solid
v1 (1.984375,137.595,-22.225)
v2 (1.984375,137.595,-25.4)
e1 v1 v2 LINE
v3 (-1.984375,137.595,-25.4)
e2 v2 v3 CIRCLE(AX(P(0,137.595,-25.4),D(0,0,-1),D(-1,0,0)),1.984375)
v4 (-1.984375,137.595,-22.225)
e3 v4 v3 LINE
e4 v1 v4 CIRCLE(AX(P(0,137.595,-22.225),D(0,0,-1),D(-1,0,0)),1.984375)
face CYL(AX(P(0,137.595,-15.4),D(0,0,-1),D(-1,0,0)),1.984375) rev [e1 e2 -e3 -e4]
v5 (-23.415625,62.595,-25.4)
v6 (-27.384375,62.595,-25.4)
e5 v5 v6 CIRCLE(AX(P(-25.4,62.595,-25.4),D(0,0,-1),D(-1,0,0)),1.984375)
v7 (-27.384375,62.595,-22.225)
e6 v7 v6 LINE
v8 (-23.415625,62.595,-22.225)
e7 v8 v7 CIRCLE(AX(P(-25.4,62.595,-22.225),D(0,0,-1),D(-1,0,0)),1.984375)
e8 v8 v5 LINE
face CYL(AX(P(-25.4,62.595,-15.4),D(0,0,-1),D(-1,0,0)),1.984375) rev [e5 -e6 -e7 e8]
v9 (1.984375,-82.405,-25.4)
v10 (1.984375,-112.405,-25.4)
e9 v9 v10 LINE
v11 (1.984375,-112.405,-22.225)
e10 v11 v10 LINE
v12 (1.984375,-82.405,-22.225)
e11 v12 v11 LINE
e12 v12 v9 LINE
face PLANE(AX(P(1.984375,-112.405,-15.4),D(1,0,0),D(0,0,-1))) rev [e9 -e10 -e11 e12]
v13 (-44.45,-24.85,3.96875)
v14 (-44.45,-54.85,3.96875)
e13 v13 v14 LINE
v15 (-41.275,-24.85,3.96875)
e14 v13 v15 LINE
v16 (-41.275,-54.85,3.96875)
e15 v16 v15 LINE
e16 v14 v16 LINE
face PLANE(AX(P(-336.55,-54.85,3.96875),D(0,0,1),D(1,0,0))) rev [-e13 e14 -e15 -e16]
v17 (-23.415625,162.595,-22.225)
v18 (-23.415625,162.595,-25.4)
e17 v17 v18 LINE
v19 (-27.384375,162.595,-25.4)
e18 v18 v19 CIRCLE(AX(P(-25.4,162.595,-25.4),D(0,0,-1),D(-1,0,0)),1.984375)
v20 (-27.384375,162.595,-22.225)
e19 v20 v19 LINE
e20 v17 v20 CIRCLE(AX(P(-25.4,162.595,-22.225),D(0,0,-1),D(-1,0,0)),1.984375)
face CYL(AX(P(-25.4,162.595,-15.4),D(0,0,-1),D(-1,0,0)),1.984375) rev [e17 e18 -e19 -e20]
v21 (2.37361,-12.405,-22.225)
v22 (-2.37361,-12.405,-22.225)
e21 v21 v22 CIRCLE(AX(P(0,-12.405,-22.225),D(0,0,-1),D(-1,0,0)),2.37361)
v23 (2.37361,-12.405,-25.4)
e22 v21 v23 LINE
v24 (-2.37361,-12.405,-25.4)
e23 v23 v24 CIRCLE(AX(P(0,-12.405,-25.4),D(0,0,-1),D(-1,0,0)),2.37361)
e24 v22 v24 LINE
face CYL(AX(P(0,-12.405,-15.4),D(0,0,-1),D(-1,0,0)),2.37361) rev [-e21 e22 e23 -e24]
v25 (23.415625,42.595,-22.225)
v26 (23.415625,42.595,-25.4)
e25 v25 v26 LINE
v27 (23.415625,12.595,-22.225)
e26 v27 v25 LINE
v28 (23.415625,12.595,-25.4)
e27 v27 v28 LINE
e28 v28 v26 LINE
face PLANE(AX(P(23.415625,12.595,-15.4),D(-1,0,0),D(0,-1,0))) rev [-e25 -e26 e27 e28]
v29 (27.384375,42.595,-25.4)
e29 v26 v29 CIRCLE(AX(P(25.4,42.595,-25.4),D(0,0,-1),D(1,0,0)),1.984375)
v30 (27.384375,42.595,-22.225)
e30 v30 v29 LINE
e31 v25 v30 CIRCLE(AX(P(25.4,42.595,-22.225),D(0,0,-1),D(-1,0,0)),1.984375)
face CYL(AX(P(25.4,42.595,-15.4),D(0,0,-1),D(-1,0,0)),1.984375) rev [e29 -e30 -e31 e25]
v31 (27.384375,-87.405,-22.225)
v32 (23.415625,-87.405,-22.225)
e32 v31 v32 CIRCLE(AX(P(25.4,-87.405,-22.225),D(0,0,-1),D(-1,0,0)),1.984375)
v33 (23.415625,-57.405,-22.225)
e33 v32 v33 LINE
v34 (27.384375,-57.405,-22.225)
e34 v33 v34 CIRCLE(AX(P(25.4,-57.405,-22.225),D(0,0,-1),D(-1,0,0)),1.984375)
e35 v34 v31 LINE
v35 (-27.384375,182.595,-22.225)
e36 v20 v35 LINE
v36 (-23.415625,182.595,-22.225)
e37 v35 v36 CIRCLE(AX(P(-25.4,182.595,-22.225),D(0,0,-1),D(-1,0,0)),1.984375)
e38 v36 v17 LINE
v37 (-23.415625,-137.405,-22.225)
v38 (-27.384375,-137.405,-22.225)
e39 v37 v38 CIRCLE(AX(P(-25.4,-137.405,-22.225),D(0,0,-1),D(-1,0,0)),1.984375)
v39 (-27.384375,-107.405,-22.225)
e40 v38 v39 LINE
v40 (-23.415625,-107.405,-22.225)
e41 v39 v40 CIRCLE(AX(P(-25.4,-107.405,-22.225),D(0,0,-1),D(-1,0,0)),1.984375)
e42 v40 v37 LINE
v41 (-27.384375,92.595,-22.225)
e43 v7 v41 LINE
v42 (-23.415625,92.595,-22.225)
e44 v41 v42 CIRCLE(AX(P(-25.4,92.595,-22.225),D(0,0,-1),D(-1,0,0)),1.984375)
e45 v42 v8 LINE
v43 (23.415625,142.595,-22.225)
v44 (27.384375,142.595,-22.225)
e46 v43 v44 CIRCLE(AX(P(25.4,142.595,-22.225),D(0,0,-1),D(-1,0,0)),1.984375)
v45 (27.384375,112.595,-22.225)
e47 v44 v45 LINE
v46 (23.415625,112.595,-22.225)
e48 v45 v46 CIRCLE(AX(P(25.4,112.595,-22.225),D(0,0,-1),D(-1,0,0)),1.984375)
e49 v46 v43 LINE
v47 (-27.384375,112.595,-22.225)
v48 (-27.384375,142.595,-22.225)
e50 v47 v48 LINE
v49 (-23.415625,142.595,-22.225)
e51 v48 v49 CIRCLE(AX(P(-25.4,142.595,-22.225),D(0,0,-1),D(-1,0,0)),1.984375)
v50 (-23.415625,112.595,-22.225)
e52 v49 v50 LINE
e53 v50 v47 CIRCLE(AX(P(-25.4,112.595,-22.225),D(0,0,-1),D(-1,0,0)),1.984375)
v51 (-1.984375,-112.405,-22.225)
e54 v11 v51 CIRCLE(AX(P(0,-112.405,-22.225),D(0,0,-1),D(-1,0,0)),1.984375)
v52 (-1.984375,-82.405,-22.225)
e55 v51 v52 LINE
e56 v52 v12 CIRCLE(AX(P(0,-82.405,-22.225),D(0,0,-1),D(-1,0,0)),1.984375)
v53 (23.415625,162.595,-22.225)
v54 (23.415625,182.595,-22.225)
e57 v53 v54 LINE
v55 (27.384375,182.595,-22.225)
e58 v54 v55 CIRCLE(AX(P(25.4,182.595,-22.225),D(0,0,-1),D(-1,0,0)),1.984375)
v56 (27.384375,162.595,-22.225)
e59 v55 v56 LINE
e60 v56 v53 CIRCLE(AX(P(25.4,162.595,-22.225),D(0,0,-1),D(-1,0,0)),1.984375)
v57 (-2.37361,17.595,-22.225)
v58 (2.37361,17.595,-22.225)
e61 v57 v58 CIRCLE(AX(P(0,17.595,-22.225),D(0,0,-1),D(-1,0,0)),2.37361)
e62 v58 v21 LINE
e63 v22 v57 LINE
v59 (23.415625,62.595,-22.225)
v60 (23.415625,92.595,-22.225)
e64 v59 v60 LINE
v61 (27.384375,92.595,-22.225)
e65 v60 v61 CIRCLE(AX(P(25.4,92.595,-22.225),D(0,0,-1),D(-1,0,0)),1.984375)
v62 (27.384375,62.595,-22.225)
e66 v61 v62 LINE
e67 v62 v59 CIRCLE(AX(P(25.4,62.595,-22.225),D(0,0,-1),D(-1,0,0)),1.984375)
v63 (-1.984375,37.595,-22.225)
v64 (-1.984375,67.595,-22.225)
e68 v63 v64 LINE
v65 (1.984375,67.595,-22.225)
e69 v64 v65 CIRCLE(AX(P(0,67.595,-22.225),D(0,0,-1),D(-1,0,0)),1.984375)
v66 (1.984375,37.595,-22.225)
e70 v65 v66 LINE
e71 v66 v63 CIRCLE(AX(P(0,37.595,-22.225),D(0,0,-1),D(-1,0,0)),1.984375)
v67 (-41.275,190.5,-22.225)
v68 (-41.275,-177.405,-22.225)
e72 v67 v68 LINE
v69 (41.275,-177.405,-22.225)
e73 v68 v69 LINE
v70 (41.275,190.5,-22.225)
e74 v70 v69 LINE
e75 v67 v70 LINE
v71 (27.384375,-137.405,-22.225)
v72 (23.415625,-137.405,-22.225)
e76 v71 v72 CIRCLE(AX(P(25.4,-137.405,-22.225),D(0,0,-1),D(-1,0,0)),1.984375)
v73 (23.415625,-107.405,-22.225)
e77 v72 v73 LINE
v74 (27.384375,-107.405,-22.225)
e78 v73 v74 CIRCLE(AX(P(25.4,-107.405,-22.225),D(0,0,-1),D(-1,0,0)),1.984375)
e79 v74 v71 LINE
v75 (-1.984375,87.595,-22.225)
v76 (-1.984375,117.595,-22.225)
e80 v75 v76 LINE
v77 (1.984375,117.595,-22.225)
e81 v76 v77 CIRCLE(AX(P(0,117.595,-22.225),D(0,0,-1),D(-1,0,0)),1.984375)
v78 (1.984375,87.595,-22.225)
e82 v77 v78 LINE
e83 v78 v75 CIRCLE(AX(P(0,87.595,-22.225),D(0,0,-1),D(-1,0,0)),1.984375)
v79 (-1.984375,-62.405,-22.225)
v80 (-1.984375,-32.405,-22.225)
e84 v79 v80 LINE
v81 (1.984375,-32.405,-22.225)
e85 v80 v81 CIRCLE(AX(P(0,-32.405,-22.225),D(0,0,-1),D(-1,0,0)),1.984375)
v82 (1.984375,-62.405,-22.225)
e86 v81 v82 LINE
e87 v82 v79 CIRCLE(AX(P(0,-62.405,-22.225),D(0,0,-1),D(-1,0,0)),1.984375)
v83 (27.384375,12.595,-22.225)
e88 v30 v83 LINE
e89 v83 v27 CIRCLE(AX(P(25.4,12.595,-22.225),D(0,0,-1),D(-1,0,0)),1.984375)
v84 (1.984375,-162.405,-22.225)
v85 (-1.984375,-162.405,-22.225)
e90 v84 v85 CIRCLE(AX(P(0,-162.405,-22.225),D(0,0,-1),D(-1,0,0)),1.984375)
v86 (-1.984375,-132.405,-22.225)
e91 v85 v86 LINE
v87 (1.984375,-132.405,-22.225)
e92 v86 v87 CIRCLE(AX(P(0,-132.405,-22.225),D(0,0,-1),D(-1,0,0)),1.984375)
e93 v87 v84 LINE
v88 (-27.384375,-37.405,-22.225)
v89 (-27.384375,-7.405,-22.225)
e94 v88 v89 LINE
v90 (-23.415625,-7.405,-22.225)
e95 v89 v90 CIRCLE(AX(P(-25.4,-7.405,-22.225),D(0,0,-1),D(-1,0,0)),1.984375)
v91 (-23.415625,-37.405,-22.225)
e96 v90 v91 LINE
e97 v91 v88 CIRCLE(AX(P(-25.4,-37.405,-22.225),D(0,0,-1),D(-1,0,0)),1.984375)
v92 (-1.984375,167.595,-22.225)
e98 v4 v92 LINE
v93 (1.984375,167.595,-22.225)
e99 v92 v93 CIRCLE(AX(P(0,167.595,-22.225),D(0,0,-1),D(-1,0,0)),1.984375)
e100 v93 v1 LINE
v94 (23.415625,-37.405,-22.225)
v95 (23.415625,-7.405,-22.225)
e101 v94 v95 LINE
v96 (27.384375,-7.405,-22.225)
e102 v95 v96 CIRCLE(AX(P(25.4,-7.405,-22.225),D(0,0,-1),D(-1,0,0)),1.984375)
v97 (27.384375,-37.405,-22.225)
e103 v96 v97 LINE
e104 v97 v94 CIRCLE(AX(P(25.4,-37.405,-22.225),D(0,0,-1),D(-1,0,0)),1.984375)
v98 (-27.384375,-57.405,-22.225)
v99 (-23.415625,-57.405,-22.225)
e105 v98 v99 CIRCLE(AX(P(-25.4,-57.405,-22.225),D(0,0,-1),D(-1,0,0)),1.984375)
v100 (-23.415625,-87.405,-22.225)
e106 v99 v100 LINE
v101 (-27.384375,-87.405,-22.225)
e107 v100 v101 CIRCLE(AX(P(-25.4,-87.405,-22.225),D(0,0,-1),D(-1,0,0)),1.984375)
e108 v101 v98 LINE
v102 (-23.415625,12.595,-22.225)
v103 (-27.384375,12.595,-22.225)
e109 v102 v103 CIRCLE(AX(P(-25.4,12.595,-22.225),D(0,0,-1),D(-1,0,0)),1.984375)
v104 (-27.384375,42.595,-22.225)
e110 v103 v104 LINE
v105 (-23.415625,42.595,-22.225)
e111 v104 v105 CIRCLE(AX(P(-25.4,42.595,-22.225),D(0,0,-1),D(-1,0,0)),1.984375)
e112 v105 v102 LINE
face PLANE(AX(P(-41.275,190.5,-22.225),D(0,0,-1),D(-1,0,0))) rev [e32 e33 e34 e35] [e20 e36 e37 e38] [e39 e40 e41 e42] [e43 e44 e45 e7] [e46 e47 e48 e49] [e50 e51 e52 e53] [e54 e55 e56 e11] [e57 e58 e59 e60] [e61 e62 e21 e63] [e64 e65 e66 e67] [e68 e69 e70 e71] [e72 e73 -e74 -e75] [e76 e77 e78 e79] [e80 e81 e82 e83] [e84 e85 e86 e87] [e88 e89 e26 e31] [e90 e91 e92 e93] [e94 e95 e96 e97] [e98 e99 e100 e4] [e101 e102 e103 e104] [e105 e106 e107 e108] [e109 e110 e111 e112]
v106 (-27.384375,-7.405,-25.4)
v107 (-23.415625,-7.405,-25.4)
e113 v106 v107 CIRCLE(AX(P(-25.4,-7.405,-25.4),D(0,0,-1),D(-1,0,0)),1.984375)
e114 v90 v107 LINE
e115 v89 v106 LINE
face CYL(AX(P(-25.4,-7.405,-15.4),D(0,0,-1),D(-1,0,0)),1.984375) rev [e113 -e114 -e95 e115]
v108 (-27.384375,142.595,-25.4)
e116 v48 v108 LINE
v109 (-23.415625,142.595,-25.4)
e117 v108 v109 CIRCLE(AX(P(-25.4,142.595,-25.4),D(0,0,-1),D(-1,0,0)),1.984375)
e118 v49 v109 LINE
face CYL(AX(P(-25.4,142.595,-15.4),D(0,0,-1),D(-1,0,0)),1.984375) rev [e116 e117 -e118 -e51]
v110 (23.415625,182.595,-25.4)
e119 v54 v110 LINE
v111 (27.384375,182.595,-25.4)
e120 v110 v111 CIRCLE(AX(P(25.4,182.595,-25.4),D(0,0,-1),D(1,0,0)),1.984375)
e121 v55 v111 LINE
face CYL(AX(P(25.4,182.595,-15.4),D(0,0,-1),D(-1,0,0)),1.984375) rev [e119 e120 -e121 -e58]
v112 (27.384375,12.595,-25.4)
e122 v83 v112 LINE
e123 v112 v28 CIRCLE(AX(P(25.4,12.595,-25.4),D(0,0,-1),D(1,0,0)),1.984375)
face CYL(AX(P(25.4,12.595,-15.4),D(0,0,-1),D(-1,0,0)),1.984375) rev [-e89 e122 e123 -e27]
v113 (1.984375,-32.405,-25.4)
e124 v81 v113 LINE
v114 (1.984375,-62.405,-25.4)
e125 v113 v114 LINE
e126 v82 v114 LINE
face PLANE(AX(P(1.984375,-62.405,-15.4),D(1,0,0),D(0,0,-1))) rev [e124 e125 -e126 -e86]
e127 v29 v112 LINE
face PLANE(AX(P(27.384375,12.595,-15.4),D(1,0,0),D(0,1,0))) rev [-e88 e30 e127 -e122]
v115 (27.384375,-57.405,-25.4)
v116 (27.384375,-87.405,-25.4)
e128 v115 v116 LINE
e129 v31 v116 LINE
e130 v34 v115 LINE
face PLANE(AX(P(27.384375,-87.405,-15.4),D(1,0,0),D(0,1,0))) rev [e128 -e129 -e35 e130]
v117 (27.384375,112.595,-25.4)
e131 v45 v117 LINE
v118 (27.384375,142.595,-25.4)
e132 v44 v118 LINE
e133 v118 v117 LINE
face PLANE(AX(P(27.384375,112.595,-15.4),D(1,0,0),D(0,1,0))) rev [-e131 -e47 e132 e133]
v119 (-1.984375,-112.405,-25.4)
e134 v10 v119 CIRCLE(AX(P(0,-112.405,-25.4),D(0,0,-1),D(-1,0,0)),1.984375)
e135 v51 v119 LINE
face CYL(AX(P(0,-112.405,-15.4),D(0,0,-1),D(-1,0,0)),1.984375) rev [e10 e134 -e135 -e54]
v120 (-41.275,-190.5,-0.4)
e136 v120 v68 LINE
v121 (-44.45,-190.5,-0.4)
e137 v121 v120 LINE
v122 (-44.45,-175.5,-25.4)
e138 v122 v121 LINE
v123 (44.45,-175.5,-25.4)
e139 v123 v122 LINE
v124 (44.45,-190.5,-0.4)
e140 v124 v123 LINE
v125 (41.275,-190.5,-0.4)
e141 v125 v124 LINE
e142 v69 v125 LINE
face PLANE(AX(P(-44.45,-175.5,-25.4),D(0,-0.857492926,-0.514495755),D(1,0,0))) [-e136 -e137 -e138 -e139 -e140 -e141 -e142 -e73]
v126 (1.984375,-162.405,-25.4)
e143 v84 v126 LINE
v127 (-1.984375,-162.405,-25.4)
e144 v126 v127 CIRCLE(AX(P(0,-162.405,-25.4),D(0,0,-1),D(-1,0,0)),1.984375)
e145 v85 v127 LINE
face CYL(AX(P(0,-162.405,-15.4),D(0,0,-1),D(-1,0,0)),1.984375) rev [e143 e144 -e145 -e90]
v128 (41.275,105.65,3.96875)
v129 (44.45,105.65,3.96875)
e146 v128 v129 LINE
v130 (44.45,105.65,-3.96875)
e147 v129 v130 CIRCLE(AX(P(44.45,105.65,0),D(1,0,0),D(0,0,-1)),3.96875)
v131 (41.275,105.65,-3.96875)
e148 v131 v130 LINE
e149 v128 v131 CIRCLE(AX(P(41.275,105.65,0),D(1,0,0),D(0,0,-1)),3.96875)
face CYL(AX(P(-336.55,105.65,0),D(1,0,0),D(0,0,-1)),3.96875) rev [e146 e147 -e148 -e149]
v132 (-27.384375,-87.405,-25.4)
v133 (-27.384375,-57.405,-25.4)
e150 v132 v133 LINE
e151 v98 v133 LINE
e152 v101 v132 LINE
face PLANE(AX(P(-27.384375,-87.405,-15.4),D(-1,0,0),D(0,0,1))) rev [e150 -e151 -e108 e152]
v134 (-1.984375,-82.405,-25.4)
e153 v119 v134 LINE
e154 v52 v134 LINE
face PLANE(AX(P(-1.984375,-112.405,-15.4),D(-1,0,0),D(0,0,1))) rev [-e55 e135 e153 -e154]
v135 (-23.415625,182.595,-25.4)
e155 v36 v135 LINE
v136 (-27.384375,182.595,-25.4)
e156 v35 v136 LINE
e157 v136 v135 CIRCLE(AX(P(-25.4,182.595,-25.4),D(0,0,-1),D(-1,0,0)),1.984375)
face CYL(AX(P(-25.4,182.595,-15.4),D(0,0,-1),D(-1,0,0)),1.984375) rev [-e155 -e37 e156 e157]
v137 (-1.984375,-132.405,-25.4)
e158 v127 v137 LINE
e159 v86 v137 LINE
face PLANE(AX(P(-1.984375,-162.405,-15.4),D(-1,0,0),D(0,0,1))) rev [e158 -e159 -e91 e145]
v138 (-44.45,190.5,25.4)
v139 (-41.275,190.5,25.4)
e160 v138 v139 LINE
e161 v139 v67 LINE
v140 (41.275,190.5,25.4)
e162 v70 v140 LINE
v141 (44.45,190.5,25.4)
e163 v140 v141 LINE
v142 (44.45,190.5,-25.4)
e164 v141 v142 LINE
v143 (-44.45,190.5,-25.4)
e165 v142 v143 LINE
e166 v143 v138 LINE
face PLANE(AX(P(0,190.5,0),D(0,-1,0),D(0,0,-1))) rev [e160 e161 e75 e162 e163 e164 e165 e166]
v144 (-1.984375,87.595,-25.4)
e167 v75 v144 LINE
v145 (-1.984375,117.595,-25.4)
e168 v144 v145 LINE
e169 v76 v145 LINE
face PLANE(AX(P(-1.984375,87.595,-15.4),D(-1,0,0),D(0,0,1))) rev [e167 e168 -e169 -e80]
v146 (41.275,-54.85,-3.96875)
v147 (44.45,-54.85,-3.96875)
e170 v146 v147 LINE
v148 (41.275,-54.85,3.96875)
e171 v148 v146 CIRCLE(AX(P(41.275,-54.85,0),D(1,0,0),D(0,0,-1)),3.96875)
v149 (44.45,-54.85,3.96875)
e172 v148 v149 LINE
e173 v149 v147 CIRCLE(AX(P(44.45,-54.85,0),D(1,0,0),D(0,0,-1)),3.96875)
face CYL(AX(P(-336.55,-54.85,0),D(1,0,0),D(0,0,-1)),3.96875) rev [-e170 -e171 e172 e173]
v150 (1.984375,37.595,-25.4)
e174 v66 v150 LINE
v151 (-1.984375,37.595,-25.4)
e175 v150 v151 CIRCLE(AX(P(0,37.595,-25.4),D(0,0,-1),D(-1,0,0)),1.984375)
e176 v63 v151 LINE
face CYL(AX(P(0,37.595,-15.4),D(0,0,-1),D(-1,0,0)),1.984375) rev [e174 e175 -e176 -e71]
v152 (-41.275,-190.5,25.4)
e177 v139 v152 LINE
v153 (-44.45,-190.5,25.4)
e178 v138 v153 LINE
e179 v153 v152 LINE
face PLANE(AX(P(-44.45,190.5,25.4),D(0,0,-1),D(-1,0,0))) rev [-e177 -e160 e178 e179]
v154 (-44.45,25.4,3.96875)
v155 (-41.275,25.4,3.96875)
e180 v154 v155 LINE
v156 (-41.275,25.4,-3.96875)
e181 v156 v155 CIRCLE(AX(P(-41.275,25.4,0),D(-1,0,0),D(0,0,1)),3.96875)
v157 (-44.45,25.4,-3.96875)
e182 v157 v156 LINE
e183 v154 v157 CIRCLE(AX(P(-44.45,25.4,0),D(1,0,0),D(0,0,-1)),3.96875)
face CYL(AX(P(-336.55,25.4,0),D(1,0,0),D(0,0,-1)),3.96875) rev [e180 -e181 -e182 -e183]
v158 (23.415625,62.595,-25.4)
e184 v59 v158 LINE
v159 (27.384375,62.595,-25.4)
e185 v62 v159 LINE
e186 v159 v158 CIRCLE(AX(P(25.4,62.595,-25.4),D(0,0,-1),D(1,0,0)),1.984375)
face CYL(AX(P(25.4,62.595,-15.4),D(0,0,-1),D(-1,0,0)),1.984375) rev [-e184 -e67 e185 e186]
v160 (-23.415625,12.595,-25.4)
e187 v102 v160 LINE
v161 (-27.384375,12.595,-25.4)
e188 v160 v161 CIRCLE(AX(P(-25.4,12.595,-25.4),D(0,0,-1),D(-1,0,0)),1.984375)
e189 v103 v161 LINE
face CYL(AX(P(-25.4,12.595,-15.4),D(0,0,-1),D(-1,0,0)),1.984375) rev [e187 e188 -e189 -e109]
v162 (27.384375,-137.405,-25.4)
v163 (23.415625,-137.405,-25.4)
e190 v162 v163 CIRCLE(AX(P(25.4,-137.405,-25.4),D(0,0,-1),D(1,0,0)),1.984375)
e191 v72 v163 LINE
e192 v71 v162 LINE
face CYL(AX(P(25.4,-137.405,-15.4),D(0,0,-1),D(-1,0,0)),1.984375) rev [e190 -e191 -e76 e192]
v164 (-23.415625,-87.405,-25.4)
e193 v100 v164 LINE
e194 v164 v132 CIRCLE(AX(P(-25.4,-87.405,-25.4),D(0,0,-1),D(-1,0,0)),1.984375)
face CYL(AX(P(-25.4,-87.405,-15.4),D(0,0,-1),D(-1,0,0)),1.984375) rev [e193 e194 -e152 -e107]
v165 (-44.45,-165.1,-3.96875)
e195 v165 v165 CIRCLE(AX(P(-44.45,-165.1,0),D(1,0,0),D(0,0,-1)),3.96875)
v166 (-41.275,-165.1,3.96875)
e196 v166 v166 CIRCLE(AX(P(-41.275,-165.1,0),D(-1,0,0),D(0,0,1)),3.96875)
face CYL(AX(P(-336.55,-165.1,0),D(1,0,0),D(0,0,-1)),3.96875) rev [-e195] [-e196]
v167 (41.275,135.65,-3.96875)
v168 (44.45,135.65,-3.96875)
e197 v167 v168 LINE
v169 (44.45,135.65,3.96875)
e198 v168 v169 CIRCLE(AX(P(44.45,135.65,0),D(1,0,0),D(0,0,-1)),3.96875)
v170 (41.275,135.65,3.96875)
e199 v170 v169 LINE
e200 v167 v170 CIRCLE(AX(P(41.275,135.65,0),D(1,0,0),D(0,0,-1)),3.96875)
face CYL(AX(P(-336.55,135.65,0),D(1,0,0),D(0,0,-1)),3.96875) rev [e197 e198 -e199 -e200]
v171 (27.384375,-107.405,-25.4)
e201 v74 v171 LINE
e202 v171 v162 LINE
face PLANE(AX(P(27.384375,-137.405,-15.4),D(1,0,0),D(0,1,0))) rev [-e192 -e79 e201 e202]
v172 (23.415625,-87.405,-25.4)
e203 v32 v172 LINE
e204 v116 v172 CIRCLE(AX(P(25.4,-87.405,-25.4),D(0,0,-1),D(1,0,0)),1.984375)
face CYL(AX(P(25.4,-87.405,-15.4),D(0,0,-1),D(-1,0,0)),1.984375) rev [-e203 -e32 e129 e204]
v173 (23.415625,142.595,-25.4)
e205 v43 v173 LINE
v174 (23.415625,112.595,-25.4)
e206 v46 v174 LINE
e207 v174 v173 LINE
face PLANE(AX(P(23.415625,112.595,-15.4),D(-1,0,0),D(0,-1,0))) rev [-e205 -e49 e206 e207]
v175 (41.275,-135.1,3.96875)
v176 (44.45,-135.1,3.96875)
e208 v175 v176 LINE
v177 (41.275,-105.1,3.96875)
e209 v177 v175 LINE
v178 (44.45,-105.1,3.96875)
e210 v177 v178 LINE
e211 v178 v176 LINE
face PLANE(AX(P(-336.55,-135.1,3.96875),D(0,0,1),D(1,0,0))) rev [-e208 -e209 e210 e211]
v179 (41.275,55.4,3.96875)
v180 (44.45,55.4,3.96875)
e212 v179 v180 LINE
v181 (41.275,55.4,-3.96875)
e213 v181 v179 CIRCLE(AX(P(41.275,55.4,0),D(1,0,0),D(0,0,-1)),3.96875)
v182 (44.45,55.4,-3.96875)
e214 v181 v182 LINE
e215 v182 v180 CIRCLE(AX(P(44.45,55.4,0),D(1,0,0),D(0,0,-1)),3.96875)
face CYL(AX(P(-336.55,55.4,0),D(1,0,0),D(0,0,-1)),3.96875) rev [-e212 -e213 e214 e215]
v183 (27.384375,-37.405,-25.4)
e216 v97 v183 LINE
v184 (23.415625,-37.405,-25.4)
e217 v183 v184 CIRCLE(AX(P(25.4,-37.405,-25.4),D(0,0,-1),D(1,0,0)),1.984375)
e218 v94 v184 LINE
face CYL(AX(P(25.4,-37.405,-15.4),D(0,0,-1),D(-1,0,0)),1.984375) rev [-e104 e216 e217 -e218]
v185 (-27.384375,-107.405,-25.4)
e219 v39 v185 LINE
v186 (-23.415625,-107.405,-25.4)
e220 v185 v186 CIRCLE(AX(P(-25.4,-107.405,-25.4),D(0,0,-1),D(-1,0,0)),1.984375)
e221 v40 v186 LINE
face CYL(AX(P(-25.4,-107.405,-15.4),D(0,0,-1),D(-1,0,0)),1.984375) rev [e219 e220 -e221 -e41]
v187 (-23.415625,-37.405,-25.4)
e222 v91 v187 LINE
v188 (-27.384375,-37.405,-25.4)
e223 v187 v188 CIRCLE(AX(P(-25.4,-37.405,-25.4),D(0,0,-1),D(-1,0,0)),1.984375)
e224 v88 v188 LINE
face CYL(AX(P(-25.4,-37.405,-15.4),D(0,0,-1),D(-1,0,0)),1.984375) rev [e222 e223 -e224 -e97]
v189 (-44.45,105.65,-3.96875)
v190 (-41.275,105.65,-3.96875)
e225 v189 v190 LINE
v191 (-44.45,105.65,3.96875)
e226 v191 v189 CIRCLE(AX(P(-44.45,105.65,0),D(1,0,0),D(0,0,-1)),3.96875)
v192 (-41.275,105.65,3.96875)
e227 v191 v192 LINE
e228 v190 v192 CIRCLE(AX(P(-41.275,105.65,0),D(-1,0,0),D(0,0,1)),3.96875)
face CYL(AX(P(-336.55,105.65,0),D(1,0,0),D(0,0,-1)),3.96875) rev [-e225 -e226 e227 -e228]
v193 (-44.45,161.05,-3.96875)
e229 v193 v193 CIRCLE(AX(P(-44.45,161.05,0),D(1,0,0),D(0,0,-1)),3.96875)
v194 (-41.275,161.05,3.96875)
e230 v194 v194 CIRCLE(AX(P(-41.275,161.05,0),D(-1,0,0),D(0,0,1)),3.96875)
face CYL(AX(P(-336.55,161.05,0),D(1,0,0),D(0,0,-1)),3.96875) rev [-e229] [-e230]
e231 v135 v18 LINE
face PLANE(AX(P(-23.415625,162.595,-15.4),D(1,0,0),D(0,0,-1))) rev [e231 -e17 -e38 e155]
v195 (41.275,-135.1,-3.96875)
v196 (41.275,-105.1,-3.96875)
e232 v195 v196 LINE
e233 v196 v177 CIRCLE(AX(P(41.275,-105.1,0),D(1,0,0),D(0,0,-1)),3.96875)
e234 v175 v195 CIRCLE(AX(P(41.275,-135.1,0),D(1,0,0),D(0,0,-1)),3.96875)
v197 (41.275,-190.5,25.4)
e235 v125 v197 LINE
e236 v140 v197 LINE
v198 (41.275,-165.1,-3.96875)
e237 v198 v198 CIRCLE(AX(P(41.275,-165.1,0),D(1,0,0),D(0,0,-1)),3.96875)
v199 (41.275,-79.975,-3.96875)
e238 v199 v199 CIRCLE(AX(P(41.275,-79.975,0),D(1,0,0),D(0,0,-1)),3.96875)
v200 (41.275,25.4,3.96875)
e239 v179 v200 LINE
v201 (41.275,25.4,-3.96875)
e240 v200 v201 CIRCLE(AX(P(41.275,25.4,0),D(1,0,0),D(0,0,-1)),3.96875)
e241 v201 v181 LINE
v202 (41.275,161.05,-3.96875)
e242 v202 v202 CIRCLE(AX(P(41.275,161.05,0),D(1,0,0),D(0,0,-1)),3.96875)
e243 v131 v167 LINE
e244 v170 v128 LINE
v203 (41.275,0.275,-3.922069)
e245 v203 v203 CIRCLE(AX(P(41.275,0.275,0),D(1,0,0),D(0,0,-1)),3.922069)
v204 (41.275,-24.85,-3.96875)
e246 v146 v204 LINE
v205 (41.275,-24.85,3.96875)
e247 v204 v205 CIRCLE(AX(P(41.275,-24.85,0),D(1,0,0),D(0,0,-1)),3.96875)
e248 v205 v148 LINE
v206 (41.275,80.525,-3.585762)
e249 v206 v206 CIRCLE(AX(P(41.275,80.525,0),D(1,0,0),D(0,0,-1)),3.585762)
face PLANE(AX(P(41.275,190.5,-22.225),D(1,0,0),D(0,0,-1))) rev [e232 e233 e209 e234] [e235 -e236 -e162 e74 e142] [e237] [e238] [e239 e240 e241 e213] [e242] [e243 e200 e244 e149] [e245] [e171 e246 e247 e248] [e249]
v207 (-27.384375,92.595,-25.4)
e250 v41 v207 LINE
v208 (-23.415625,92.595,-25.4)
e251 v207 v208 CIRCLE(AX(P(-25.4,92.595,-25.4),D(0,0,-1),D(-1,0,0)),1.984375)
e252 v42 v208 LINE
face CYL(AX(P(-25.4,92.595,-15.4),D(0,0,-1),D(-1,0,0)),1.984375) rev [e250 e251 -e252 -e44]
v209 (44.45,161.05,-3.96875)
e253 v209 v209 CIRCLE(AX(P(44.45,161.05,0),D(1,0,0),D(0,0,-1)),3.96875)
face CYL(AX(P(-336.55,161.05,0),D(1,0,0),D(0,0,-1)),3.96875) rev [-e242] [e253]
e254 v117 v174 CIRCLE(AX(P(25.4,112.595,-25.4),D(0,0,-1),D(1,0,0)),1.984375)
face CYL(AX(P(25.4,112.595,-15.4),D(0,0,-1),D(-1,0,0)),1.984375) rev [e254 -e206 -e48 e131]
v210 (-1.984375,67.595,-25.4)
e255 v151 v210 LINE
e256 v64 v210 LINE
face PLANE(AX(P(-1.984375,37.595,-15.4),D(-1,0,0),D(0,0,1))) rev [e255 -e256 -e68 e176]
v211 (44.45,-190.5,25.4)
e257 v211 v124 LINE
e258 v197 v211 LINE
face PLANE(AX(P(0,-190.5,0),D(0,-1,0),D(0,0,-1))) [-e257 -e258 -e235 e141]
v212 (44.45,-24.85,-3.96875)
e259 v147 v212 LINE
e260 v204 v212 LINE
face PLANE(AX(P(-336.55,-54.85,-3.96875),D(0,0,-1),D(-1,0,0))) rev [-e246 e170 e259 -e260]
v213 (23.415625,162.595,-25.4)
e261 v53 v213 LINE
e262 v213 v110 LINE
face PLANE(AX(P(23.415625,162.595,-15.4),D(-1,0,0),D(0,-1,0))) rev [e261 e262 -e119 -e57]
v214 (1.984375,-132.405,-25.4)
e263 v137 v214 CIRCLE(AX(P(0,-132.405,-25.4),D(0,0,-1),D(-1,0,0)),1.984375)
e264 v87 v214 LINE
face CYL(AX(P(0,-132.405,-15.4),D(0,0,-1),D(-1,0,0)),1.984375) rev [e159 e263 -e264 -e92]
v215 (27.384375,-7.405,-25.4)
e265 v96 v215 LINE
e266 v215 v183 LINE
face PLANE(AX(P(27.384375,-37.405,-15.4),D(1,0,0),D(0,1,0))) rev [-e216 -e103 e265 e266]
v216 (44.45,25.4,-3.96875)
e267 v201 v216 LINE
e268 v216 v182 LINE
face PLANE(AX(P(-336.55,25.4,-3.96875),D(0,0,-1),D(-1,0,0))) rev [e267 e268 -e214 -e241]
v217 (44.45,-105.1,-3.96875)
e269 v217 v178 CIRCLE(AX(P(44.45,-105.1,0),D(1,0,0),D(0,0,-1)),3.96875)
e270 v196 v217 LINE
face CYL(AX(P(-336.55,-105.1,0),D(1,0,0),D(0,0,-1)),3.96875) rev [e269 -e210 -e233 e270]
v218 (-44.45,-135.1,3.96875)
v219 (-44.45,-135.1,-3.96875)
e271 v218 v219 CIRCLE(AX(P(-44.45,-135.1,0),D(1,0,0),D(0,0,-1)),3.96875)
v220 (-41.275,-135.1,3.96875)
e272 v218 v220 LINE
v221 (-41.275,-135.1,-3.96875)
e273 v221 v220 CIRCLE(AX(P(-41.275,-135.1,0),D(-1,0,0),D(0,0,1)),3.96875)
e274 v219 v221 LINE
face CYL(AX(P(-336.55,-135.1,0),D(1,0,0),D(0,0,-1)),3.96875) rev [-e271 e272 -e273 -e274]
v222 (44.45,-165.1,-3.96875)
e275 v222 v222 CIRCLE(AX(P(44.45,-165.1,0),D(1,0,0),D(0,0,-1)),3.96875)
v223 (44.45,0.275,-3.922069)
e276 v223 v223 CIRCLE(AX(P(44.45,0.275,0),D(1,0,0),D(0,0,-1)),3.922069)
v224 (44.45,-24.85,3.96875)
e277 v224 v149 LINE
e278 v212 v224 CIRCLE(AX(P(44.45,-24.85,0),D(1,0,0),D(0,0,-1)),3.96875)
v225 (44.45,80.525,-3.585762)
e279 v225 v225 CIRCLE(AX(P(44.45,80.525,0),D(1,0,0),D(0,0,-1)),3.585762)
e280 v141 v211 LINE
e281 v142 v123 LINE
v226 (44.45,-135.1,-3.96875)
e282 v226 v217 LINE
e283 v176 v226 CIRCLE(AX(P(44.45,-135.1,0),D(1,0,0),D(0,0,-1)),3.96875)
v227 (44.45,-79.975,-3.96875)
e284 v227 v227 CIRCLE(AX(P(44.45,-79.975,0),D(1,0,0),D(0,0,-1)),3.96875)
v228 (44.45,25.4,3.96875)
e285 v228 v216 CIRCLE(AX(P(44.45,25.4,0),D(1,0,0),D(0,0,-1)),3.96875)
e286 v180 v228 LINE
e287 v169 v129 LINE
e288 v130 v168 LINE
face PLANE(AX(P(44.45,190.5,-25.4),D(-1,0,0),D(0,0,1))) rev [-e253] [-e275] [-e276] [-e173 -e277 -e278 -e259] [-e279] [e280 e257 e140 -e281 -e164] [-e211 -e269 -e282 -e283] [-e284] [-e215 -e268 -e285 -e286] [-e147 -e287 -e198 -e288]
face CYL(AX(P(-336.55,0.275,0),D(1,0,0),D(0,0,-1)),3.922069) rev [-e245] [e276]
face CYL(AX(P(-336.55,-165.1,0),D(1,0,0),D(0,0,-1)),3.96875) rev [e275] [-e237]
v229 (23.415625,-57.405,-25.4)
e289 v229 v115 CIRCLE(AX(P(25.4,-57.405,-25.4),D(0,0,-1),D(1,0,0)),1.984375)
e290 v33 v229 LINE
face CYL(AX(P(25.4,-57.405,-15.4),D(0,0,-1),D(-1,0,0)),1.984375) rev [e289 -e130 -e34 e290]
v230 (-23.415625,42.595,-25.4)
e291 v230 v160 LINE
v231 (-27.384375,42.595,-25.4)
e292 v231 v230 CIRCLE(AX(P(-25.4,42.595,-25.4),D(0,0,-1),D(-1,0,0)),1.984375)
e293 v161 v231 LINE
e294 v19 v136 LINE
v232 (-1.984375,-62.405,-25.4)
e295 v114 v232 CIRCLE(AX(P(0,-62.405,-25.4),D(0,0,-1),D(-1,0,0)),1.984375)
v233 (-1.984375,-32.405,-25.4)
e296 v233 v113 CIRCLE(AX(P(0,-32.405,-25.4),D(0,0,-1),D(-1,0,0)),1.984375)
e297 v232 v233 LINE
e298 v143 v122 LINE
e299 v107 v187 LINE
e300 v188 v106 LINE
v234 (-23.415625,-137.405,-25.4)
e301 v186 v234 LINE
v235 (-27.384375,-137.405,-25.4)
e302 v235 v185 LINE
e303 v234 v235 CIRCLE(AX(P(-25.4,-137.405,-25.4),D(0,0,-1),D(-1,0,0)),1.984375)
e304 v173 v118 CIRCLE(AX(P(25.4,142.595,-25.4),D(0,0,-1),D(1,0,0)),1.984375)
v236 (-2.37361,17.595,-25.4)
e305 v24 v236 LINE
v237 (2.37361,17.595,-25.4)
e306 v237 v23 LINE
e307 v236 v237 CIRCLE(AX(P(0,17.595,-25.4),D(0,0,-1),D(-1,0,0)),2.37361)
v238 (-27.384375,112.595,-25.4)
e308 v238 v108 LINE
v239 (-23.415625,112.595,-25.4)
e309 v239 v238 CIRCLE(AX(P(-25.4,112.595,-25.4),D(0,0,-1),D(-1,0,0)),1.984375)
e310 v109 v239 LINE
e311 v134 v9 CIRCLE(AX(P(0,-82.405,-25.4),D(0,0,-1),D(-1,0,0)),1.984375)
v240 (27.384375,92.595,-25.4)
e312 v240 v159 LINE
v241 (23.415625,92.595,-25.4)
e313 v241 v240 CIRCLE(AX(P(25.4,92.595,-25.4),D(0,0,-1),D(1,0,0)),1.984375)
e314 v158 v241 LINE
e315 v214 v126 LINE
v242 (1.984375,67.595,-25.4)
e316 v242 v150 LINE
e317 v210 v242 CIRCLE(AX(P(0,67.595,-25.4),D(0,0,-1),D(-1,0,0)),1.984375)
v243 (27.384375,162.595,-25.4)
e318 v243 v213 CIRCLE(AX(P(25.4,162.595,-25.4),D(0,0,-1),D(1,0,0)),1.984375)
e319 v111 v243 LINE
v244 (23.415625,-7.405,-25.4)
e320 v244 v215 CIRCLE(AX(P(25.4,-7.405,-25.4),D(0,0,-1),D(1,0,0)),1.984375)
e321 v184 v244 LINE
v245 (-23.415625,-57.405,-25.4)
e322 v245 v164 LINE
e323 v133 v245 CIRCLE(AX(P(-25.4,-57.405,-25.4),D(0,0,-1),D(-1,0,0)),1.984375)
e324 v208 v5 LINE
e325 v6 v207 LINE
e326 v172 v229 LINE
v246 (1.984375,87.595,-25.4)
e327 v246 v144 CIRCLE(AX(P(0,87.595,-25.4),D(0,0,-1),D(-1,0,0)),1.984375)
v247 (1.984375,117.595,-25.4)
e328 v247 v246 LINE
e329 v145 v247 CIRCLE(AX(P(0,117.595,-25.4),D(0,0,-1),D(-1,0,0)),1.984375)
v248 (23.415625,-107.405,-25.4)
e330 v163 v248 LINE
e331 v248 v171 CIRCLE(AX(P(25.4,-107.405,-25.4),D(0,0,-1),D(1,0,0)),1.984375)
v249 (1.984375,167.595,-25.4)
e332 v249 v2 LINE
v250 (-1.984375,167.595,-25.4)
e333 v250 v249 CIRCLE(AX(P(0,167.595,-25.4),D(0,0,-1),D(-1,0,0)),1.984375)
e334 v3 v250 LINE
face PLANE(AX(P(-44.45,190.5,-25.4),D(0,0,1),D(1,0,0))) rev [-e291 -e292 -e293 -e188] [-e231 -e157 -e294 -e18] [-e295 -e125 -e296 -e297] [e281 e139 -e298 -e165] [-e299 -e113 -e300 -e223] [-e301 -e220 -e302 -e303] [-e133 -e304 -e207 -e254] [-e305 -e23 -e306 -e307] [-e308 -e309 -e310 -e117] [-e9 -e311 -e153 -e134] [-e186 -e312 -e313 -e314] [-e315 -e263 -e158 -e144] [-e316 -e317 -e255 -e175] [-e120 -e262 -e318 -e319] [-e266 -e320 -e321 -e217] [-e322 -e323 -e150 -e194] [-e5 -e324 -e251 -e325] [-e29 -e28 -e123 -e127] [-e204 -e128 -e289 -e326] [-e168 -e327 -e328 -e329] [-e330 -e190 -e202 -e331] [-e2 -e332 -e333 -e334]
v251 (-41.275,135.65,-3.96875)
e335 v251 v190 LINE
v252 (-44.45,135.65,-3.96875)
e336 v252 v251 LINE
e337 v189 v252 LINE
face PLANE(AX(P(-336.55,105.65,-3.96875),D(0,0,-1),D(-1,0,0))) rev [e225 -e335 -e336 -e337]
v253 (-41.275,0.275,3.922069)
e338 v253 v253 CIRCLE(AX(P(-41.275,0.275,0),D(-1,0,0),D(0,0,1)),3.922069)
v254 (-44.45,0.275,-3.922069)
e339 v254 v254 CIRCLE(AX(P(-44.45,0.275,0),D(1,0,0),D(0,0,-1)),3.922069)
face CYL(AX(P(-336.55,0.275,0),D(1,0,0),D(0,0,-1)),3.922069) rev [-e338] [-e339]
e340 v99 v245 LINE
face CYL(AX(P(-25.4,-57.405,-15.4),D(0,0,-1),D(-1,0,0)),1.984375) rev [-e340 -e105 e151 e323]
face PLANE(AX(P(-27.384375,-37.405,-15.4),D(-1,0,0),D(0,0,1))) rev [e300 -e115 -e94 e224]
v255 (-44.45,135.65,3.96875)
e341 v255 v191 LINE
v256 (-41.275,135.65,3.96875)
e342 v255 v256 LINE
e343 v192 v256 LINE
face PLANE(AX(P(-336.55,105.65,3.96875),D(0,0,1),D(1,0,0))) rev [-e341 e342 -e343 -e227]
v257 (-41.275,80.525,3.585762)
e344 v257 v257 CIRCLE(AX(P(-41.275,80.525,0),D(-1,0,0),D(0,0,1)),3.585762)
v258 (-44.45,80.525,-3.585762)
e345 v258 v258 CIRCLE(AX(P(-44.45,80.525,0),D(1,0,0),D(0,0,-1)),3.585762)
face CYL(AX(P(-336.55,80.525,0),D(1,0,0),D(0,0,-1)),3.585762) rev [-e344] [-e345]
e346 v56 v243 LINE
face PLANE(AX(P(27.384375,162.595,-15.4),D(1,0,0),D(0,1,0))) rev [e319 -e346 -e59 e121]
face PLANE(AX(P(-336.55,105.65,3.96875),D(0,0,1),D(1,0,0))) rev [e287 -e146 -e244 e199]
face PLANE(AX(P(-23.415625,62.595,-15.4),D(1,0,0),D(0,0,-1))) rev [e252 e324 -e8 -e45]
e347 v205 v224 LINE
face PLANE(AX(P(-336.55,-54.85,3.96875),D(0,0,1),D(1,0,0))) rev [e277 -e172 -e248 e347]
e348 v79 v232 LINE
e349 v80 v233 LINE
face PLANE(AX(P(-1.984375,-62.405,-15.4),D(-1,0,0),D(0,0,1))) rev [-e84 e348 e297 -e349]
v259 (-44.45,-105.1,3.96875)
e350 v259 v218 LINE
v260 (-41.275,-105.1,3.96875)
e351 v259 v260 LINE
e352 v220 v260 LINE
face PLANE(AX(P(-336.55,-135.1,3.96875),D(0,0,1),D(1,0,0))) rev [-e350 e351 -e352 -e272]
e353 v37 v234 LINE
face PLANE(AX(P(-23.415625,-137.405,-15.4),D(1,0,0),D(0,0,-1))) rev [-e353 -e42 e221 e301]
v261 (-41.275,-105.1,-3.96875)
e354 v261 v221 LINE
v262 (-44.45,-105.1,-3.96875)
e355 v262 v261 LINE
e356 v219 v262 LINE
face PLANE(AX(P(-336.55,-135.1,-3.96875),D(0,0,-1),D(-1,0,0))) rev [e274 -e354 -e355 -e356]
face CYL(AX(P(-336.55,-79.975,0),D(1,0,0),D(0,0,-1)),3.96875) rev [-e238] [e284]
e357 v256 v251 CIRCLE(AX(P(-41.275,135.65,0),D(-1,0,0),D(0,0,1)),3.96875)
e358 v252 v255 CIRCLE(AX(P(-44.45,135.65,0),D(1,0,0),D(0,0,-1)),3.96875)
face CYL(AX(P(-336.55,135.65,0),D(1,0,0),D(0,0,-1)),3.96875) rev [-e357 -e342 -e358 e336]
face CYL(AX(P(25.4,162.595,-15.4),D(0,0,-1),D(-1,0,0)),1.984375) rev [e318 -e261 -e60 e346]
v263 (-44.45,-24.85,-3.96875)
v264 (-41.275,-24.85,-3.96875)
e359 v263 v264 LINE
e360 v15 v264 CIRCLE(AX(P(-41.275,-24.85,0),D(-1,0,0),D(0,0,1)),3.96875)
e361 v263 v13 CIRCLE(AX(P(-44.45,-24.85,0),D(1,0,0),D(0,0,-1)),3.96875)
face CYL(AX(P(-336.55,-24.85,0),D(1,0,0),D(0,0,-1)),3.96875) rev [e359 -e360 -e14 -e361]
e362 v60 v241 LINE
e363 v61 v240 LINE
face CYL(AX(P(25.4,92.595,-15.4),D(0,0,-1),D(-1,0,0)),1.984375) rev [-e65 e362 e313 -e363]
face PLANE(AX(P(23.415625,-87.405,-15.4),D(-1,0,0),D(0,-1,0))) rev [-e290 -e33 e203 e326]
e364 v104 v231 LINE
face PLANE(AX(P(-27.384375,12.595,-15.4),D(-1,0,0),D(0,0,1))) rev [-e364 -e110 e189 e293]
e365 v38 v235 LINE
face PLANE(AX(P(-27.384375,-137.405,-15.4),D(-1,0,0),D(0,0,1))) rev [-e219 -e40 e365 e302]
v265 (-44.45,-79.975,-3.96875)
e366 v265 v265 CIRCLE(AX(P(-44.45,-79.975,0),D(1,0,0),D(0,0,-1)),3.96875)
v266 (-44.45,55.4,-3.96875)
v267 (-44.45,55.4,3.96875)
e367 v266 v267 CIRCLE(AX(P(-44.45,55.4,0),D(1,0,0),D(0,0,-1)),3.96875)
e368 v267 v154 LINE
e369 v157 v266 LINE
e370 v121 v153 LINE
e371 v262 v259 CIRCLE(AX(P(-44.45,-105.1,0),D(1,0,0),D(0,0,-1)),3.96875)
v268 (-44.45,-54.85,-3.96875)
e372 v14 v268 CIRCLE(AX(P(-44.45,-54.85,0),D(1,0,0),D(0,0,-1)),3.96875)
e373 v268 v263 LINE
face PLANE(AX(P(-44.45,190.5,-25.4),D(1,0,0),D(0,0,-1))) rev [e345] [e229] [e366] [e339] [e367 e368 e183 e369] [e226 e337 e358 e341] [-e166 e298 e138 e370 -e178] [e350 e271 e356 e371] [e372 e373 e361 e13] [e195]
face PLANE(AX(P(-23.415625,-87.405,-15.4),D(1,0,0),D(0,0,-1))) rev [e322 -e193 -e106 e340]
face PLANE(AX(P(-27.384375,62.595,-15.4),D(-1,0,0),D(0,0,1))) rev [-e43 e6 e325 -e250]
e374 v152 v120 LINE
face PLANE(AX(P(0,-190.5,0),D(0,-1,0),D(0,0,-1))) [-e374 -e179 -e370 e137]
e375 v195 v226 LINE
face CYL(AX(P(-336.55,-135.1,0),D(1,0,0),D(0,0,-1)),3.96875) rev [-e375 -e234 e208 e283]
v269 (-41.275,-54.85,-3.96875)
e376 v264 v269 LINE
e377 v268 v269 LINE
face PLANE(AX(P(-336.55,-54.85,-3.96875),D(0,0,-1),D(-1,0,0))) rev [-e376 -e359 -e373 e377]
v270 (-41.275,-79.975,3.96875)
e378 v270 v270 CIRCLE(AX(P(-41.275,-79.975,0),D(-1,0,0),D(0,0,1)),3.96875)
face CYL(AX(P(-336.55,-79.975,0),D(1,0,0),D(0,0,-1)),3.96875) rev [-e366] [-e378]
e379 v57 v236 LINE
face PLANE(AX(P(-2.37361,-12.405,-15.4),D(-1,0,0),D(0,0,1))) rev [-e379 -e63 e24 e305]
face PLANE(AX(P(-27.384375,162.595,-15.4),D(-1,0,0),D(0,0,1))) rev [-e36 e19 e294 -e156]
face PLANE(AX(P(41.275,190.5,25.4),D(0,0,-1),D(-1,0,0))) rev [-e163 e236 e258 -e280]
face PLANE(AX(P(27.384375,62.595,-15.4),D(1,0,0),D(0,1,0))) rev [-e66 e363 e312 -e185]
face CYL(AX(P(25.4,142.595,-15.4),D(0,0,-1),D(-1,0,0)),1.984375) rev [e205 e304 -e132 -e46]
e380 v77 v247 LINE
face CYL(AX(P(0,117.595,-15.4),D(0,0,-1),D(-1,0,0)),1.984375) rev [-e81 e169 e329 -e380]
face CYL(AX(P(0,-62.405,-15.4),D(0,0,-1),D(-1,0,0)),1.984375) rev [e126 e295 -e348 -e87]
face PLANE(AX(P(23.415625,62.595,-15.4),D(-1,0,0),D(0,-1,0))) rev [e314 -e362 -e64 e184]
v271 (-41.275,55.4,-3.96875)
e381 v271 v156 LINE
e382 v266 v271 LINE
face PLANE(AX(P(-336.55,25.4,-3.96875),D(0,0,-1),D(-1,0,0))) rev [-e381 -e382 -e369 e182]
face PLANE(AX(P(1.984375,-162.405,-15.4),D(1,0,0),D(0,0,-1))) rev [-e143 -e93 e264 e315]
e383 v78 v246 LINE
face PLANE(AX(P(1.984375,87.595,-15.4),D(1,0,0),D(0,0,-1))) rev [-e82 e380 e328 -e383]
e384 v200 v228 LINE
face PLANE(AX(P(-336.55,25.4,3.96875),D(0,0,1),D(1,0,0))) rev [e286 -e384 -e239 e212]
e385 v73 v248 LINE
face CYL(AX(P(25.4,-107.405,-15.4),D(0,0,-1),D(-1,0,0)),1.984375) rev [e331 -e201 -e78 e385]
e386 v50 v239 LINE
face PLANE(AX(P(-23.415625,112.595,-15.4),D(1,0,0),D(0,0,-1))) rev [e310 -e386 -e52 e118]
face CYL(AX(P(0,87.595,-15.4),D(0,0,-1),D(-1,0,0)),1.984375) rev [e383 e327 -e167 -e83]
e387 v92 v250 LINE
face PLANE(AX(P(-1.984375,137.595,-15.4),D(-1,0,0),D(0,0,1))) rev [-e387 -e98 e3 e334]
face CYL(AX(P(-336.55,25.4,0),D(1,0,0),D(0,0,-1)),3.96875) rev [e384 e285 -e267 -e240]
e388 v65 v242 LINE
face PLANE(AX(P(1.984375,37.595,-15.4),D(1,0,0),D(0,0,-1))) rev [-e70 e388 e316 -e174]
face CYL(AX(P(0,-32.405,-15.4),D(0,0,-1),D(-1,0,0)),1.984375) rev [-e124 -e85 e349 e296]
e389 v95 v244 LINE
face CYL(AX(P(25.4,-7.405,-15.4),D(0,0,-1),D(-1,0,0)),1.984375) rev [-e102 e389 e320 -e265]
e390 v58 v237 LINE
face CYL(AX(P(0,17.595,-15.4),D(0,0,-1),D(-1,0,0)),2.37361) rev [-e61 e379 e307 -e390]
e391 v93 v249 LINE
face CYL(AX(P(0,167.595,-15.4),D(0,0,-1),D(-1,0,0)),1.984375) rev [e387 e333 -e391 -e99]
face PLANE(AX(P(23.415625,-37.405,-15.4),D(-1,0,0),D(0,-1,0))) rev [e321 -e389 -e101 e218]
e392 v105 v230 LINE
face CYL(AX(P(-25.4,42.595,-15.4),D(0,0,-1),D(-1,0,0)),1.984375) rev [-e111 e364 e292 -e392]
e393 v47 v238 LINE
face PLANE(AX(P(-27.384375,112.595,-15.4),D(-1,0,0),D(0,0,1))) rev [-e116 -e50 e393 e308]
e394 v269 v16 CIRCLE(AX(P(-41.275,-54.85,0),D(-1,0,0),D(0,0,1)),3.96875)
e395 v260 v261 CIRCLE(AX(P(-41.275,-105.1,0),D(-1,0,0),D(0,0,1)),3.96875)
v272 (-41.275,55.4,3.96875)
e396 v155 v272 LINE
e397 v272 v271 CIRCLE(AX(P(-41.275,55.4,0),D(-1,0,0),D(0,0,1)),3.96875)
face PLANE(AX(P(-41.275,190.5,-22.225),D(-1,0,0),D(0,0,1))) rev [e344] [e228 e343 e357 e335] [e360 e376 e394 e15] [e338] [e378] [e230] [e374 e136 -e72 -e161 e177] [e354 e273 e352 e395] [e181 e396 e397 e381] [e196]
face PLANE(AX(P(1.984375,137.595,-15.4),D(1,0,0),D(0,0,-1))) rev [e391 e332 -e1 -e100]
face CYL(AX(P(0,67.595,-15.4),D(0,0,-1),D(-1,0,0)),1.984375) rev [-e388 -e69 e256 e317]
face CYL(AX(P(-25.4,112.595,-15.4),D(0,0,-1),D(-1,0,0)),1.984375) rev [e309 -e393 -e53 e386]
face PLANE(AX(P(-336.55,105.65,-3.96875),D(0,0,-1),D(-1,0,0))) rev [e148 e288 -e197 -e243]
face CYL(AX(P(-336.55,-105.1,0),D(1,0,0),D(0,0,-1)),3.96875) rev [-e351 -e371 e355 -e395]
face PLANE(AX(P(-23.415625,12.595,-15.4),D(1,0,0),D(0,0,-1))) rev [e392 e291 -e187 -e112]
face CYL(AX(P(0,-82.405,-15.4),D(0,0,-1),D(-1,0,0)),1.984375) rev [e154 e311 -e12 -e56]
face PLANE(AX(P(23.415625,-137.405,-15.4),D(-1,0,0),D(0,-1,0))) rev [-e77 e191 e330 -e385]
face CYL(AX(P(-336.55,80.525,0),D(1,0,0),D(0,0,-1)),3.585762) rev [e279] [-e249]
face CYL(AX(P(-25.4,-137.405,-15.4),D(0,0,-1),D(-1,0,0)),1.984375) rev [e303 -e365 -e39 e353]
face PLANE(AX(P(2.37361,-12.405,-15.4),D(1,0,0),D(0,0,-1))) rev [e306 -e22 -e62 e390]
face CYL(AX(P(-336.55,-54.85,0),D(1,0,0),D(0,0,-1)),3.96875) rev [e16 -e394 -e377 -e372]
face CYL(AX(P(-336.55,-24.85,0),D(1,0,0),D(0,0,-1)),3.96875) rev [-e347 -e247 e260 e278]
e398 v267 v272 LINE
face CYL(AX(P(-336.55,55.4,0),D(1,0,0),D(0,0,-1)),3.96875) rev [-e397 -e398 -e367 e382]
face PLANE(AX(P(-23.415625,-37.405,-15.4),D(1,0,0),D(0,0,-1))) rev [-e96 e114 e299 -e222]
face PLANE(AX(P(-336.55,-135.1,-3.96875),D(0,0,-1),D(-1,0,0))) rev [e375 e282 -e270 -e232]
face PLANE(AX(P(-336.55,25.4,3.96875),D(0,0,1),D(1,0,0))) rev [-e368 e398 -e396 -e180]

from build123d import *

# Parameters (mm, degrees)
BOSS_EXTRUDE1_DEPTH = 190.5
SKETCH3_R           = 3.96875
CUT_EXTRUDE1_DEPTH  = 381
CUT_EXTRUDE2_DEPTH  = 381
SKETCH5_R           = 3.92206945
SKETCH5_R_2         = 3.96875
SKETCH5_R_3         = 3.58576203
CUT_EXTRUDE3_DEPTH  = 381
CHAMFER1_SIZE       = 25
CHAMFER1_SIZE_2     = 15
CUT_EXTRUDE4_DEPTH  = 10


with BuildPart() as part:
    # Sketch1 → Boss-Extrude1 (new, symmetric)
    with BuildSketch(Plane(origin=(0, 0, 0), x_dir=(1, 0, 0), z_dir=(0, 1, 0))):
        Polygon((-41.275, 22.225), (-41.275, -25.4), (-44.45, -25.4), (-44.45, 25.4), (44.45, 25.4), (44.45, -25.4), (41.275, -25.4), (41.275, 22.225), align=None)
    extrude(amount=BOSS_EXTRUDE1_DEPTH, both=True)

    # Sketch3 → Cut-Extrude1 (cut)
    with BuildSketch(Plane(origin=(44.45, 0, 0), x_dir=(0, 0, -1), z_dir=(1, 0, 0))):
        with Locations((0, -165.1)):
            Circle(SKETCH3_R)
    extrude(amount=-CUT_EXTRUDE1_DEPTH, mode=Mode.SUBTRACT)

    # Sketch4 → Cut-Extrude2 (cut)
    with BuildSketch(Plane(origin=(44.45, 0, 0), x_dir=(0, 0, -1), z_dir=(1, 0, 0))):
        with BuildLine():
            Line((-3.96875, -135.1), (-3.96875, -105.1))
            ThreePointArc((-3.96875, -105.1), (0, -101.13125), (3.96875, -105.1))
            Line((3.96875, -105.1), (3.96875, -135.1))
            ThreePointArc((3.96875, -135.1), (0, -139.06875), (-3.96875, -135.1))
        make_face()
        with BuildLine():
            Line((-3.96875, -54.85), (-3.96875, -24.85))
            ThreePointArc((-3.96875, -24.85), (0, -20.88125), (3.96875, -24.85))
            Line((3.96875, -24.85), (3.96875, -54.85))
            ThreePointArc((3.96875, -54.85), (0, -58.81875), (-3.96875, -54.85))
        make_face()
        with BuildLine():
            Line((-3.96875, 25.4), (-3.96875, 55.4))
            ThreePointArc((-3.96875, 55.4), (0, 59.36875), (3.96875, 55.4))
            Line((3.96875, 55.4), (3.96875, 25.4))
            ThreePointArc((3.96875, 25.4), (0, 21.43125), (-3.96875, 25.4))
        make_face()
        with BuildLine():
            Line((-3.96875, 105.65), (-3.96875, 135.65))
            ThreePointArc((-3.96875, 135.65), (0, 139.61875), (3.96875, 135.65))
            Line((3.96875, 135.65), (3.96875, 105.65))
            ThreePointArc((3.96875, 105.65), (0, 101.68125), (-3.96875, 105.65))
        make_face()
    extrude(amount=-CUT_EXTRUDE2_DEPTH, mode=Mode.SUBTRACT)

    # Sketch5 → Cut-Extrude3 (cut)
    with BuildSketch(Plane(origin=(44.45, 0, 0), x_dir=(0, 0, -1), z_dir=(1, 0, 0))):
        with Locations((0, 0.275)):
            Circle(SKETCH5_R)
        with Locations((0, -79.975)):
            Circle(SKETCH5_R_2)
        with Locations((0, 80.525)):
            Circle(SKETCH5_R_3)
        with Locations((0, 161.05)):
            Circle(SKETCH5_R_2)
    extrude(amount=-CUT_EXTRUDE3_DEPTH, mode=Mode.SUBTRACT)

    # Chamfer1
    # the kernel refuses this chamfer: 25, 15 mm, written as the material it takes off along each edge
    with BuildSketch(Plane(origin=(-109.10652743, -190.5, -25.4), x_dir=(0, -0.01989341895858275, 0.9998021063601229), z_dir=(1, 0, 0))) as chamfer1_piece_1:
        Polygon((CHAMFER1_SIZE * 0.99980210636, -CHAMFER1_SIZE * 0.0198934189586), (-CHAMFER1_SIZE_2 * 0.0198934189586, -CHAMFER1_SIZE_2 * 0.99980210636), (0, 0), align=None)
    extrude(amount=218.21305486, mode=Mode.SUBTRACT)

    # Sketch6 → Cut-Extrude4 (cut)
    with BuildSketch(Plane(origin=(0, 0, -25.4), x_dir=(-1, 0, 0), z_dir=(0, 0, -1))):
        with BuildLine():
            Line((-1.984375, -162.405), (-1.984375, -132.405))
            ThreePointArc((-1.984375, -132.405), (0, -130.420625), (1.984375, -132.405))
            Line((1.984375, -132.405), (1.984375, -162.405))
            ThreePointArc((1.984375, -162.405), (0, -164.389375), (-1.984375, -162.405))
        make_face()
        with BuildLine():
            Line((-1.984375, -112.405), (-1.984375, -82.405))
            ThreePointArc((-1.984375, -82.405), (0, -80.420625), (1.984375, -82.405))
            Line((1.984375, -82.405), (1.984375, -112.405))
            ThreePointArc((1.984375, -112.405), (0, -114.389375), (-1.984375, -112.405))
        make_face()
        with BuildLine():
            Line((-1.984375, -62.405), (-1.984375, -32.405))
            ThreePointArc((-1.984375, -32.405), (0, -30.420625), (1.984375, -32.405))
            Line((1.984375, -32.405), (1.984375, -62.405))
            ThreePointArc((1.984375, -62.405), (0, -64.389375), (-1.984375, -62.405))
        make_face()
        with BuildLine():
            Line((-2.373609799, -12.405), (-2.373609799, 17.595))
            ThreePointArc((-2.373609799, 17.595), (0, 19.968609799), (2.373609799, 17.595))
            Line((2.373609799, 17.595), (2.373609799, -12.405))
            ThreePointArc((2.373609799, -12.405), (0, -14.778609799), (-2.373609799, -12.405))
        make_face()
        with BuildLine():
            Line((-1.984375, 37.595), (-1.984375, 67.595))
            ThreePointArc((-1.984375, 67.595), (0, 69.579375), (1.984375, 67.595))
            Line((1.984375, 67.595), (1.984375, 37.595))
            ThreePointArc((1.984375, 37.595), (0, 35.610625), (-1.984375, 37.595))
        make_face()
        with BuildLine():
            Line((-1.984375, 87.595), (-1.984375, 117.595))
            ThreePointArc((-1.984375, 117.595), (0, 119.579375), (1.984375, 117.595))
            Line((1.984375, 117.595), (1.984375, 87.595))
            ThreePointArc((1.984375, 87.595), (0, 85.610625), (-1.984375, 87.595))
        make_face()
        with BuildLine():
            Line((-1.984375, 137.595), (-1.984375, 167.595))
            ThreePointArc((-1.984375, 167.595), (0, 169.579375), (1.984375, 167.595))
            Line((1.984375, 167.595), (1.984375, 137.595))
            ThreePointArc((1.984375, 137.595), (0, 135.610625), (-1.984375, 137.595))
        make_face()
        with BuildLine():
            Line((23.415625, -137.405), (23.415625, -107.405))
            ThreePointArc((23.415625, -107.405), (25.4, -105.420625), (27.384375, -107.405))
            Line((27.384375, -107.405), (27.384375, -137.405))
            ThreePointArc((27.384375, -137.405), (25.4, -139.389375), (23.415625, -137.405))
        make_face()
        with BuildLine():
            Line((23.415625, -87.405), (23.415625, -57.405))
            ThreePointArc((23.415625, -57.405), (25.4, -55.420625), (27.384375, -57.405))
            Line((27.384375, -57.405), (27.384375, -87.405))
            ThreePointArc((27.384375, -87.405), (25.4, -89.389375), (23.415625, -87.405))
        make_face()
        with BuildLine():
            Line((23.415625, -37.405), (23.415625, -7.405))
            ThreePointArc((23.415625, -7.405), (25.4, -5.420625), (27.384375, -7.405))
            Line((27.384375, -7.405), (27.384375, -37.405))
            ThreePointArc((27.384375, -37.405), (25.4, -39.389375), (23.415625, -37.405))
        make_face()
        with BuildLine():
            Line((23.415625, 12.595), (23.415625, 42.595))
            ThreePointArc((23.415625, 42.595), (25.4, 44.579375), (27.384375, 42.595))
            Line((27.384375, 42.595), (27.384375, 12.595))
            ThreePointArc((27.384375, 12.595), (25.4, 10.610625), (23.415625, 12.595))
        make_face()
        with BuildLine():
            Line((23.415625, 62.595), (23.415625, 92.595))
            ThreePointArc((23.415625, 92.595), (25.4, 94.579375), (27.384375, 92.595))
            Line((27.384375, 92.595), (27.384375, 62.595))
            ThreePointArc((27.384375, 62.595), (25.4, 60.610625), (23.415625, 62.595))
        make_face()
        with BuildLine():
            Line((23.415625, 112.595), (23.415625, 142.595))
            ThreePointArc((23.415625, 142.595), (25.4, 144.579375), (27.384375, 142.595))
            Line((27.384375, 142.595), (27.384375, 112.595))
            ThreePointArc((27.384375, 112.595), (25.4, 110.610625), (23.415625, 112.595))
        make_face()
        with BuildLine():
            Line((23.415625, 162.595), (23.415625, 182.595))
            ThreePointArc((23.415625, 182.595), (25.4, 184.579375), (27.384375, 182.595))
            Line((27.384375, 182.595), (27.384375, 162.595))
            ThreePointArc((27.384375, 162.595), (25.4, 160.610625), (23.415625, 162.595))
        make_face()
        with BuildLine():
            Line((-23.415625, -137.405), (-23.415625, -107.405))
            ThreePointArc((-23.415625, -107.405), (-25.4, -105.420625), (-27.384375, -107.405))
            Line((-27.384375, -107.405), (-27.384375, -137.405))
            ThreePointArc((-27.384375, -137.405), (-25.4, -139.389375), (-23.415625, -137.405))
        make_face()
        with BuildLine():
            Line((-23.415625, -87.405), (-23.415625, -57.405))
            ThreePointArc((-23.415625, -57.405), (-25.4, -55.420625), (-27.384375, -57.405))
            Line((-27.384375, -57.405), (-27.384375, -87.405))
            ThreePointArc((-27.384375, -87.405), (-25.4, -89.389375), (-23.415625, -87.405))
        make_face()
        with BuildLine():
            Line((-23.415625, -37.405), (-23.415625, -7.405))
            ThreePointArc((-23.415625, -7.405), (-25.4, -5.420625), (-27.384375, -7.405))
            Line((-27.384375, -7.405), (-27.384375, -37.405))
            ThreePointArc((-27.384375, -37.405), (-25.4, -39.389375), (-23.415625, -37.405))
        make_face()
        with BuildLine():
            Line((-23.415625, 12.595), (-23.415625, 42.595))
            ThreePointArc((-23.415625, 42.595), (-25.4, 44.579375), (-27.384375, 42.595))
            Line((-27.384375, 42.595), (-27.384375, 12.595))
            ThreePointArc((-27.384375, 12.595), (-25.4, 10.610625), (-23.415625, 12.595))
        make_face()
        with BuildLine():
            Line((-23.415625, 62.595), (-23.415625, 92.595))
            ThreePointArc((-23.415625, 92.595), (-25.4, 94.579375), (-27.384375, 92.595))
            Line((-27.384375, 92.595), (-27.384375, 62.595))
            ThreePointArc((-27.384375, 62.595), (-25.4, 60.610625), (-23.415625, 62.595))
        make_face()
        with BuildLine():
            Line((-23.415625, 112.595), (-23.415625, 142.595))
            ThreePointArc((-23.415625, 142.595), (-25.4, 144.579375), (-27.384375, 142.595))
            Line((-27.384375, 142.595), (-27.384375, 112.595))
            ThreePointArc((-27.384375, 112.595), (-25.4, 110.610625), (-23.415625, 112.595))
        make_face()
        with BuildLine():
            Line((-23.415625, 162.595), (-23.415625, 182.595))
            ThreePointArc((-23.415625, 182.595), (-25.4, 184.579375), (-27.384375, 182.595))
            Line((-27.384375, 182.595), (-27.384375, 162.595))
            ThreePointArc((-27.384375, 162.595), (-25.4, 160.610625), (-23.415625, 162.595))
        make_face()
    extrude(amount=-CUT_EXTRUDE4_DEPTH, mode=Mode.SUBTRACT)


solid = part.part
